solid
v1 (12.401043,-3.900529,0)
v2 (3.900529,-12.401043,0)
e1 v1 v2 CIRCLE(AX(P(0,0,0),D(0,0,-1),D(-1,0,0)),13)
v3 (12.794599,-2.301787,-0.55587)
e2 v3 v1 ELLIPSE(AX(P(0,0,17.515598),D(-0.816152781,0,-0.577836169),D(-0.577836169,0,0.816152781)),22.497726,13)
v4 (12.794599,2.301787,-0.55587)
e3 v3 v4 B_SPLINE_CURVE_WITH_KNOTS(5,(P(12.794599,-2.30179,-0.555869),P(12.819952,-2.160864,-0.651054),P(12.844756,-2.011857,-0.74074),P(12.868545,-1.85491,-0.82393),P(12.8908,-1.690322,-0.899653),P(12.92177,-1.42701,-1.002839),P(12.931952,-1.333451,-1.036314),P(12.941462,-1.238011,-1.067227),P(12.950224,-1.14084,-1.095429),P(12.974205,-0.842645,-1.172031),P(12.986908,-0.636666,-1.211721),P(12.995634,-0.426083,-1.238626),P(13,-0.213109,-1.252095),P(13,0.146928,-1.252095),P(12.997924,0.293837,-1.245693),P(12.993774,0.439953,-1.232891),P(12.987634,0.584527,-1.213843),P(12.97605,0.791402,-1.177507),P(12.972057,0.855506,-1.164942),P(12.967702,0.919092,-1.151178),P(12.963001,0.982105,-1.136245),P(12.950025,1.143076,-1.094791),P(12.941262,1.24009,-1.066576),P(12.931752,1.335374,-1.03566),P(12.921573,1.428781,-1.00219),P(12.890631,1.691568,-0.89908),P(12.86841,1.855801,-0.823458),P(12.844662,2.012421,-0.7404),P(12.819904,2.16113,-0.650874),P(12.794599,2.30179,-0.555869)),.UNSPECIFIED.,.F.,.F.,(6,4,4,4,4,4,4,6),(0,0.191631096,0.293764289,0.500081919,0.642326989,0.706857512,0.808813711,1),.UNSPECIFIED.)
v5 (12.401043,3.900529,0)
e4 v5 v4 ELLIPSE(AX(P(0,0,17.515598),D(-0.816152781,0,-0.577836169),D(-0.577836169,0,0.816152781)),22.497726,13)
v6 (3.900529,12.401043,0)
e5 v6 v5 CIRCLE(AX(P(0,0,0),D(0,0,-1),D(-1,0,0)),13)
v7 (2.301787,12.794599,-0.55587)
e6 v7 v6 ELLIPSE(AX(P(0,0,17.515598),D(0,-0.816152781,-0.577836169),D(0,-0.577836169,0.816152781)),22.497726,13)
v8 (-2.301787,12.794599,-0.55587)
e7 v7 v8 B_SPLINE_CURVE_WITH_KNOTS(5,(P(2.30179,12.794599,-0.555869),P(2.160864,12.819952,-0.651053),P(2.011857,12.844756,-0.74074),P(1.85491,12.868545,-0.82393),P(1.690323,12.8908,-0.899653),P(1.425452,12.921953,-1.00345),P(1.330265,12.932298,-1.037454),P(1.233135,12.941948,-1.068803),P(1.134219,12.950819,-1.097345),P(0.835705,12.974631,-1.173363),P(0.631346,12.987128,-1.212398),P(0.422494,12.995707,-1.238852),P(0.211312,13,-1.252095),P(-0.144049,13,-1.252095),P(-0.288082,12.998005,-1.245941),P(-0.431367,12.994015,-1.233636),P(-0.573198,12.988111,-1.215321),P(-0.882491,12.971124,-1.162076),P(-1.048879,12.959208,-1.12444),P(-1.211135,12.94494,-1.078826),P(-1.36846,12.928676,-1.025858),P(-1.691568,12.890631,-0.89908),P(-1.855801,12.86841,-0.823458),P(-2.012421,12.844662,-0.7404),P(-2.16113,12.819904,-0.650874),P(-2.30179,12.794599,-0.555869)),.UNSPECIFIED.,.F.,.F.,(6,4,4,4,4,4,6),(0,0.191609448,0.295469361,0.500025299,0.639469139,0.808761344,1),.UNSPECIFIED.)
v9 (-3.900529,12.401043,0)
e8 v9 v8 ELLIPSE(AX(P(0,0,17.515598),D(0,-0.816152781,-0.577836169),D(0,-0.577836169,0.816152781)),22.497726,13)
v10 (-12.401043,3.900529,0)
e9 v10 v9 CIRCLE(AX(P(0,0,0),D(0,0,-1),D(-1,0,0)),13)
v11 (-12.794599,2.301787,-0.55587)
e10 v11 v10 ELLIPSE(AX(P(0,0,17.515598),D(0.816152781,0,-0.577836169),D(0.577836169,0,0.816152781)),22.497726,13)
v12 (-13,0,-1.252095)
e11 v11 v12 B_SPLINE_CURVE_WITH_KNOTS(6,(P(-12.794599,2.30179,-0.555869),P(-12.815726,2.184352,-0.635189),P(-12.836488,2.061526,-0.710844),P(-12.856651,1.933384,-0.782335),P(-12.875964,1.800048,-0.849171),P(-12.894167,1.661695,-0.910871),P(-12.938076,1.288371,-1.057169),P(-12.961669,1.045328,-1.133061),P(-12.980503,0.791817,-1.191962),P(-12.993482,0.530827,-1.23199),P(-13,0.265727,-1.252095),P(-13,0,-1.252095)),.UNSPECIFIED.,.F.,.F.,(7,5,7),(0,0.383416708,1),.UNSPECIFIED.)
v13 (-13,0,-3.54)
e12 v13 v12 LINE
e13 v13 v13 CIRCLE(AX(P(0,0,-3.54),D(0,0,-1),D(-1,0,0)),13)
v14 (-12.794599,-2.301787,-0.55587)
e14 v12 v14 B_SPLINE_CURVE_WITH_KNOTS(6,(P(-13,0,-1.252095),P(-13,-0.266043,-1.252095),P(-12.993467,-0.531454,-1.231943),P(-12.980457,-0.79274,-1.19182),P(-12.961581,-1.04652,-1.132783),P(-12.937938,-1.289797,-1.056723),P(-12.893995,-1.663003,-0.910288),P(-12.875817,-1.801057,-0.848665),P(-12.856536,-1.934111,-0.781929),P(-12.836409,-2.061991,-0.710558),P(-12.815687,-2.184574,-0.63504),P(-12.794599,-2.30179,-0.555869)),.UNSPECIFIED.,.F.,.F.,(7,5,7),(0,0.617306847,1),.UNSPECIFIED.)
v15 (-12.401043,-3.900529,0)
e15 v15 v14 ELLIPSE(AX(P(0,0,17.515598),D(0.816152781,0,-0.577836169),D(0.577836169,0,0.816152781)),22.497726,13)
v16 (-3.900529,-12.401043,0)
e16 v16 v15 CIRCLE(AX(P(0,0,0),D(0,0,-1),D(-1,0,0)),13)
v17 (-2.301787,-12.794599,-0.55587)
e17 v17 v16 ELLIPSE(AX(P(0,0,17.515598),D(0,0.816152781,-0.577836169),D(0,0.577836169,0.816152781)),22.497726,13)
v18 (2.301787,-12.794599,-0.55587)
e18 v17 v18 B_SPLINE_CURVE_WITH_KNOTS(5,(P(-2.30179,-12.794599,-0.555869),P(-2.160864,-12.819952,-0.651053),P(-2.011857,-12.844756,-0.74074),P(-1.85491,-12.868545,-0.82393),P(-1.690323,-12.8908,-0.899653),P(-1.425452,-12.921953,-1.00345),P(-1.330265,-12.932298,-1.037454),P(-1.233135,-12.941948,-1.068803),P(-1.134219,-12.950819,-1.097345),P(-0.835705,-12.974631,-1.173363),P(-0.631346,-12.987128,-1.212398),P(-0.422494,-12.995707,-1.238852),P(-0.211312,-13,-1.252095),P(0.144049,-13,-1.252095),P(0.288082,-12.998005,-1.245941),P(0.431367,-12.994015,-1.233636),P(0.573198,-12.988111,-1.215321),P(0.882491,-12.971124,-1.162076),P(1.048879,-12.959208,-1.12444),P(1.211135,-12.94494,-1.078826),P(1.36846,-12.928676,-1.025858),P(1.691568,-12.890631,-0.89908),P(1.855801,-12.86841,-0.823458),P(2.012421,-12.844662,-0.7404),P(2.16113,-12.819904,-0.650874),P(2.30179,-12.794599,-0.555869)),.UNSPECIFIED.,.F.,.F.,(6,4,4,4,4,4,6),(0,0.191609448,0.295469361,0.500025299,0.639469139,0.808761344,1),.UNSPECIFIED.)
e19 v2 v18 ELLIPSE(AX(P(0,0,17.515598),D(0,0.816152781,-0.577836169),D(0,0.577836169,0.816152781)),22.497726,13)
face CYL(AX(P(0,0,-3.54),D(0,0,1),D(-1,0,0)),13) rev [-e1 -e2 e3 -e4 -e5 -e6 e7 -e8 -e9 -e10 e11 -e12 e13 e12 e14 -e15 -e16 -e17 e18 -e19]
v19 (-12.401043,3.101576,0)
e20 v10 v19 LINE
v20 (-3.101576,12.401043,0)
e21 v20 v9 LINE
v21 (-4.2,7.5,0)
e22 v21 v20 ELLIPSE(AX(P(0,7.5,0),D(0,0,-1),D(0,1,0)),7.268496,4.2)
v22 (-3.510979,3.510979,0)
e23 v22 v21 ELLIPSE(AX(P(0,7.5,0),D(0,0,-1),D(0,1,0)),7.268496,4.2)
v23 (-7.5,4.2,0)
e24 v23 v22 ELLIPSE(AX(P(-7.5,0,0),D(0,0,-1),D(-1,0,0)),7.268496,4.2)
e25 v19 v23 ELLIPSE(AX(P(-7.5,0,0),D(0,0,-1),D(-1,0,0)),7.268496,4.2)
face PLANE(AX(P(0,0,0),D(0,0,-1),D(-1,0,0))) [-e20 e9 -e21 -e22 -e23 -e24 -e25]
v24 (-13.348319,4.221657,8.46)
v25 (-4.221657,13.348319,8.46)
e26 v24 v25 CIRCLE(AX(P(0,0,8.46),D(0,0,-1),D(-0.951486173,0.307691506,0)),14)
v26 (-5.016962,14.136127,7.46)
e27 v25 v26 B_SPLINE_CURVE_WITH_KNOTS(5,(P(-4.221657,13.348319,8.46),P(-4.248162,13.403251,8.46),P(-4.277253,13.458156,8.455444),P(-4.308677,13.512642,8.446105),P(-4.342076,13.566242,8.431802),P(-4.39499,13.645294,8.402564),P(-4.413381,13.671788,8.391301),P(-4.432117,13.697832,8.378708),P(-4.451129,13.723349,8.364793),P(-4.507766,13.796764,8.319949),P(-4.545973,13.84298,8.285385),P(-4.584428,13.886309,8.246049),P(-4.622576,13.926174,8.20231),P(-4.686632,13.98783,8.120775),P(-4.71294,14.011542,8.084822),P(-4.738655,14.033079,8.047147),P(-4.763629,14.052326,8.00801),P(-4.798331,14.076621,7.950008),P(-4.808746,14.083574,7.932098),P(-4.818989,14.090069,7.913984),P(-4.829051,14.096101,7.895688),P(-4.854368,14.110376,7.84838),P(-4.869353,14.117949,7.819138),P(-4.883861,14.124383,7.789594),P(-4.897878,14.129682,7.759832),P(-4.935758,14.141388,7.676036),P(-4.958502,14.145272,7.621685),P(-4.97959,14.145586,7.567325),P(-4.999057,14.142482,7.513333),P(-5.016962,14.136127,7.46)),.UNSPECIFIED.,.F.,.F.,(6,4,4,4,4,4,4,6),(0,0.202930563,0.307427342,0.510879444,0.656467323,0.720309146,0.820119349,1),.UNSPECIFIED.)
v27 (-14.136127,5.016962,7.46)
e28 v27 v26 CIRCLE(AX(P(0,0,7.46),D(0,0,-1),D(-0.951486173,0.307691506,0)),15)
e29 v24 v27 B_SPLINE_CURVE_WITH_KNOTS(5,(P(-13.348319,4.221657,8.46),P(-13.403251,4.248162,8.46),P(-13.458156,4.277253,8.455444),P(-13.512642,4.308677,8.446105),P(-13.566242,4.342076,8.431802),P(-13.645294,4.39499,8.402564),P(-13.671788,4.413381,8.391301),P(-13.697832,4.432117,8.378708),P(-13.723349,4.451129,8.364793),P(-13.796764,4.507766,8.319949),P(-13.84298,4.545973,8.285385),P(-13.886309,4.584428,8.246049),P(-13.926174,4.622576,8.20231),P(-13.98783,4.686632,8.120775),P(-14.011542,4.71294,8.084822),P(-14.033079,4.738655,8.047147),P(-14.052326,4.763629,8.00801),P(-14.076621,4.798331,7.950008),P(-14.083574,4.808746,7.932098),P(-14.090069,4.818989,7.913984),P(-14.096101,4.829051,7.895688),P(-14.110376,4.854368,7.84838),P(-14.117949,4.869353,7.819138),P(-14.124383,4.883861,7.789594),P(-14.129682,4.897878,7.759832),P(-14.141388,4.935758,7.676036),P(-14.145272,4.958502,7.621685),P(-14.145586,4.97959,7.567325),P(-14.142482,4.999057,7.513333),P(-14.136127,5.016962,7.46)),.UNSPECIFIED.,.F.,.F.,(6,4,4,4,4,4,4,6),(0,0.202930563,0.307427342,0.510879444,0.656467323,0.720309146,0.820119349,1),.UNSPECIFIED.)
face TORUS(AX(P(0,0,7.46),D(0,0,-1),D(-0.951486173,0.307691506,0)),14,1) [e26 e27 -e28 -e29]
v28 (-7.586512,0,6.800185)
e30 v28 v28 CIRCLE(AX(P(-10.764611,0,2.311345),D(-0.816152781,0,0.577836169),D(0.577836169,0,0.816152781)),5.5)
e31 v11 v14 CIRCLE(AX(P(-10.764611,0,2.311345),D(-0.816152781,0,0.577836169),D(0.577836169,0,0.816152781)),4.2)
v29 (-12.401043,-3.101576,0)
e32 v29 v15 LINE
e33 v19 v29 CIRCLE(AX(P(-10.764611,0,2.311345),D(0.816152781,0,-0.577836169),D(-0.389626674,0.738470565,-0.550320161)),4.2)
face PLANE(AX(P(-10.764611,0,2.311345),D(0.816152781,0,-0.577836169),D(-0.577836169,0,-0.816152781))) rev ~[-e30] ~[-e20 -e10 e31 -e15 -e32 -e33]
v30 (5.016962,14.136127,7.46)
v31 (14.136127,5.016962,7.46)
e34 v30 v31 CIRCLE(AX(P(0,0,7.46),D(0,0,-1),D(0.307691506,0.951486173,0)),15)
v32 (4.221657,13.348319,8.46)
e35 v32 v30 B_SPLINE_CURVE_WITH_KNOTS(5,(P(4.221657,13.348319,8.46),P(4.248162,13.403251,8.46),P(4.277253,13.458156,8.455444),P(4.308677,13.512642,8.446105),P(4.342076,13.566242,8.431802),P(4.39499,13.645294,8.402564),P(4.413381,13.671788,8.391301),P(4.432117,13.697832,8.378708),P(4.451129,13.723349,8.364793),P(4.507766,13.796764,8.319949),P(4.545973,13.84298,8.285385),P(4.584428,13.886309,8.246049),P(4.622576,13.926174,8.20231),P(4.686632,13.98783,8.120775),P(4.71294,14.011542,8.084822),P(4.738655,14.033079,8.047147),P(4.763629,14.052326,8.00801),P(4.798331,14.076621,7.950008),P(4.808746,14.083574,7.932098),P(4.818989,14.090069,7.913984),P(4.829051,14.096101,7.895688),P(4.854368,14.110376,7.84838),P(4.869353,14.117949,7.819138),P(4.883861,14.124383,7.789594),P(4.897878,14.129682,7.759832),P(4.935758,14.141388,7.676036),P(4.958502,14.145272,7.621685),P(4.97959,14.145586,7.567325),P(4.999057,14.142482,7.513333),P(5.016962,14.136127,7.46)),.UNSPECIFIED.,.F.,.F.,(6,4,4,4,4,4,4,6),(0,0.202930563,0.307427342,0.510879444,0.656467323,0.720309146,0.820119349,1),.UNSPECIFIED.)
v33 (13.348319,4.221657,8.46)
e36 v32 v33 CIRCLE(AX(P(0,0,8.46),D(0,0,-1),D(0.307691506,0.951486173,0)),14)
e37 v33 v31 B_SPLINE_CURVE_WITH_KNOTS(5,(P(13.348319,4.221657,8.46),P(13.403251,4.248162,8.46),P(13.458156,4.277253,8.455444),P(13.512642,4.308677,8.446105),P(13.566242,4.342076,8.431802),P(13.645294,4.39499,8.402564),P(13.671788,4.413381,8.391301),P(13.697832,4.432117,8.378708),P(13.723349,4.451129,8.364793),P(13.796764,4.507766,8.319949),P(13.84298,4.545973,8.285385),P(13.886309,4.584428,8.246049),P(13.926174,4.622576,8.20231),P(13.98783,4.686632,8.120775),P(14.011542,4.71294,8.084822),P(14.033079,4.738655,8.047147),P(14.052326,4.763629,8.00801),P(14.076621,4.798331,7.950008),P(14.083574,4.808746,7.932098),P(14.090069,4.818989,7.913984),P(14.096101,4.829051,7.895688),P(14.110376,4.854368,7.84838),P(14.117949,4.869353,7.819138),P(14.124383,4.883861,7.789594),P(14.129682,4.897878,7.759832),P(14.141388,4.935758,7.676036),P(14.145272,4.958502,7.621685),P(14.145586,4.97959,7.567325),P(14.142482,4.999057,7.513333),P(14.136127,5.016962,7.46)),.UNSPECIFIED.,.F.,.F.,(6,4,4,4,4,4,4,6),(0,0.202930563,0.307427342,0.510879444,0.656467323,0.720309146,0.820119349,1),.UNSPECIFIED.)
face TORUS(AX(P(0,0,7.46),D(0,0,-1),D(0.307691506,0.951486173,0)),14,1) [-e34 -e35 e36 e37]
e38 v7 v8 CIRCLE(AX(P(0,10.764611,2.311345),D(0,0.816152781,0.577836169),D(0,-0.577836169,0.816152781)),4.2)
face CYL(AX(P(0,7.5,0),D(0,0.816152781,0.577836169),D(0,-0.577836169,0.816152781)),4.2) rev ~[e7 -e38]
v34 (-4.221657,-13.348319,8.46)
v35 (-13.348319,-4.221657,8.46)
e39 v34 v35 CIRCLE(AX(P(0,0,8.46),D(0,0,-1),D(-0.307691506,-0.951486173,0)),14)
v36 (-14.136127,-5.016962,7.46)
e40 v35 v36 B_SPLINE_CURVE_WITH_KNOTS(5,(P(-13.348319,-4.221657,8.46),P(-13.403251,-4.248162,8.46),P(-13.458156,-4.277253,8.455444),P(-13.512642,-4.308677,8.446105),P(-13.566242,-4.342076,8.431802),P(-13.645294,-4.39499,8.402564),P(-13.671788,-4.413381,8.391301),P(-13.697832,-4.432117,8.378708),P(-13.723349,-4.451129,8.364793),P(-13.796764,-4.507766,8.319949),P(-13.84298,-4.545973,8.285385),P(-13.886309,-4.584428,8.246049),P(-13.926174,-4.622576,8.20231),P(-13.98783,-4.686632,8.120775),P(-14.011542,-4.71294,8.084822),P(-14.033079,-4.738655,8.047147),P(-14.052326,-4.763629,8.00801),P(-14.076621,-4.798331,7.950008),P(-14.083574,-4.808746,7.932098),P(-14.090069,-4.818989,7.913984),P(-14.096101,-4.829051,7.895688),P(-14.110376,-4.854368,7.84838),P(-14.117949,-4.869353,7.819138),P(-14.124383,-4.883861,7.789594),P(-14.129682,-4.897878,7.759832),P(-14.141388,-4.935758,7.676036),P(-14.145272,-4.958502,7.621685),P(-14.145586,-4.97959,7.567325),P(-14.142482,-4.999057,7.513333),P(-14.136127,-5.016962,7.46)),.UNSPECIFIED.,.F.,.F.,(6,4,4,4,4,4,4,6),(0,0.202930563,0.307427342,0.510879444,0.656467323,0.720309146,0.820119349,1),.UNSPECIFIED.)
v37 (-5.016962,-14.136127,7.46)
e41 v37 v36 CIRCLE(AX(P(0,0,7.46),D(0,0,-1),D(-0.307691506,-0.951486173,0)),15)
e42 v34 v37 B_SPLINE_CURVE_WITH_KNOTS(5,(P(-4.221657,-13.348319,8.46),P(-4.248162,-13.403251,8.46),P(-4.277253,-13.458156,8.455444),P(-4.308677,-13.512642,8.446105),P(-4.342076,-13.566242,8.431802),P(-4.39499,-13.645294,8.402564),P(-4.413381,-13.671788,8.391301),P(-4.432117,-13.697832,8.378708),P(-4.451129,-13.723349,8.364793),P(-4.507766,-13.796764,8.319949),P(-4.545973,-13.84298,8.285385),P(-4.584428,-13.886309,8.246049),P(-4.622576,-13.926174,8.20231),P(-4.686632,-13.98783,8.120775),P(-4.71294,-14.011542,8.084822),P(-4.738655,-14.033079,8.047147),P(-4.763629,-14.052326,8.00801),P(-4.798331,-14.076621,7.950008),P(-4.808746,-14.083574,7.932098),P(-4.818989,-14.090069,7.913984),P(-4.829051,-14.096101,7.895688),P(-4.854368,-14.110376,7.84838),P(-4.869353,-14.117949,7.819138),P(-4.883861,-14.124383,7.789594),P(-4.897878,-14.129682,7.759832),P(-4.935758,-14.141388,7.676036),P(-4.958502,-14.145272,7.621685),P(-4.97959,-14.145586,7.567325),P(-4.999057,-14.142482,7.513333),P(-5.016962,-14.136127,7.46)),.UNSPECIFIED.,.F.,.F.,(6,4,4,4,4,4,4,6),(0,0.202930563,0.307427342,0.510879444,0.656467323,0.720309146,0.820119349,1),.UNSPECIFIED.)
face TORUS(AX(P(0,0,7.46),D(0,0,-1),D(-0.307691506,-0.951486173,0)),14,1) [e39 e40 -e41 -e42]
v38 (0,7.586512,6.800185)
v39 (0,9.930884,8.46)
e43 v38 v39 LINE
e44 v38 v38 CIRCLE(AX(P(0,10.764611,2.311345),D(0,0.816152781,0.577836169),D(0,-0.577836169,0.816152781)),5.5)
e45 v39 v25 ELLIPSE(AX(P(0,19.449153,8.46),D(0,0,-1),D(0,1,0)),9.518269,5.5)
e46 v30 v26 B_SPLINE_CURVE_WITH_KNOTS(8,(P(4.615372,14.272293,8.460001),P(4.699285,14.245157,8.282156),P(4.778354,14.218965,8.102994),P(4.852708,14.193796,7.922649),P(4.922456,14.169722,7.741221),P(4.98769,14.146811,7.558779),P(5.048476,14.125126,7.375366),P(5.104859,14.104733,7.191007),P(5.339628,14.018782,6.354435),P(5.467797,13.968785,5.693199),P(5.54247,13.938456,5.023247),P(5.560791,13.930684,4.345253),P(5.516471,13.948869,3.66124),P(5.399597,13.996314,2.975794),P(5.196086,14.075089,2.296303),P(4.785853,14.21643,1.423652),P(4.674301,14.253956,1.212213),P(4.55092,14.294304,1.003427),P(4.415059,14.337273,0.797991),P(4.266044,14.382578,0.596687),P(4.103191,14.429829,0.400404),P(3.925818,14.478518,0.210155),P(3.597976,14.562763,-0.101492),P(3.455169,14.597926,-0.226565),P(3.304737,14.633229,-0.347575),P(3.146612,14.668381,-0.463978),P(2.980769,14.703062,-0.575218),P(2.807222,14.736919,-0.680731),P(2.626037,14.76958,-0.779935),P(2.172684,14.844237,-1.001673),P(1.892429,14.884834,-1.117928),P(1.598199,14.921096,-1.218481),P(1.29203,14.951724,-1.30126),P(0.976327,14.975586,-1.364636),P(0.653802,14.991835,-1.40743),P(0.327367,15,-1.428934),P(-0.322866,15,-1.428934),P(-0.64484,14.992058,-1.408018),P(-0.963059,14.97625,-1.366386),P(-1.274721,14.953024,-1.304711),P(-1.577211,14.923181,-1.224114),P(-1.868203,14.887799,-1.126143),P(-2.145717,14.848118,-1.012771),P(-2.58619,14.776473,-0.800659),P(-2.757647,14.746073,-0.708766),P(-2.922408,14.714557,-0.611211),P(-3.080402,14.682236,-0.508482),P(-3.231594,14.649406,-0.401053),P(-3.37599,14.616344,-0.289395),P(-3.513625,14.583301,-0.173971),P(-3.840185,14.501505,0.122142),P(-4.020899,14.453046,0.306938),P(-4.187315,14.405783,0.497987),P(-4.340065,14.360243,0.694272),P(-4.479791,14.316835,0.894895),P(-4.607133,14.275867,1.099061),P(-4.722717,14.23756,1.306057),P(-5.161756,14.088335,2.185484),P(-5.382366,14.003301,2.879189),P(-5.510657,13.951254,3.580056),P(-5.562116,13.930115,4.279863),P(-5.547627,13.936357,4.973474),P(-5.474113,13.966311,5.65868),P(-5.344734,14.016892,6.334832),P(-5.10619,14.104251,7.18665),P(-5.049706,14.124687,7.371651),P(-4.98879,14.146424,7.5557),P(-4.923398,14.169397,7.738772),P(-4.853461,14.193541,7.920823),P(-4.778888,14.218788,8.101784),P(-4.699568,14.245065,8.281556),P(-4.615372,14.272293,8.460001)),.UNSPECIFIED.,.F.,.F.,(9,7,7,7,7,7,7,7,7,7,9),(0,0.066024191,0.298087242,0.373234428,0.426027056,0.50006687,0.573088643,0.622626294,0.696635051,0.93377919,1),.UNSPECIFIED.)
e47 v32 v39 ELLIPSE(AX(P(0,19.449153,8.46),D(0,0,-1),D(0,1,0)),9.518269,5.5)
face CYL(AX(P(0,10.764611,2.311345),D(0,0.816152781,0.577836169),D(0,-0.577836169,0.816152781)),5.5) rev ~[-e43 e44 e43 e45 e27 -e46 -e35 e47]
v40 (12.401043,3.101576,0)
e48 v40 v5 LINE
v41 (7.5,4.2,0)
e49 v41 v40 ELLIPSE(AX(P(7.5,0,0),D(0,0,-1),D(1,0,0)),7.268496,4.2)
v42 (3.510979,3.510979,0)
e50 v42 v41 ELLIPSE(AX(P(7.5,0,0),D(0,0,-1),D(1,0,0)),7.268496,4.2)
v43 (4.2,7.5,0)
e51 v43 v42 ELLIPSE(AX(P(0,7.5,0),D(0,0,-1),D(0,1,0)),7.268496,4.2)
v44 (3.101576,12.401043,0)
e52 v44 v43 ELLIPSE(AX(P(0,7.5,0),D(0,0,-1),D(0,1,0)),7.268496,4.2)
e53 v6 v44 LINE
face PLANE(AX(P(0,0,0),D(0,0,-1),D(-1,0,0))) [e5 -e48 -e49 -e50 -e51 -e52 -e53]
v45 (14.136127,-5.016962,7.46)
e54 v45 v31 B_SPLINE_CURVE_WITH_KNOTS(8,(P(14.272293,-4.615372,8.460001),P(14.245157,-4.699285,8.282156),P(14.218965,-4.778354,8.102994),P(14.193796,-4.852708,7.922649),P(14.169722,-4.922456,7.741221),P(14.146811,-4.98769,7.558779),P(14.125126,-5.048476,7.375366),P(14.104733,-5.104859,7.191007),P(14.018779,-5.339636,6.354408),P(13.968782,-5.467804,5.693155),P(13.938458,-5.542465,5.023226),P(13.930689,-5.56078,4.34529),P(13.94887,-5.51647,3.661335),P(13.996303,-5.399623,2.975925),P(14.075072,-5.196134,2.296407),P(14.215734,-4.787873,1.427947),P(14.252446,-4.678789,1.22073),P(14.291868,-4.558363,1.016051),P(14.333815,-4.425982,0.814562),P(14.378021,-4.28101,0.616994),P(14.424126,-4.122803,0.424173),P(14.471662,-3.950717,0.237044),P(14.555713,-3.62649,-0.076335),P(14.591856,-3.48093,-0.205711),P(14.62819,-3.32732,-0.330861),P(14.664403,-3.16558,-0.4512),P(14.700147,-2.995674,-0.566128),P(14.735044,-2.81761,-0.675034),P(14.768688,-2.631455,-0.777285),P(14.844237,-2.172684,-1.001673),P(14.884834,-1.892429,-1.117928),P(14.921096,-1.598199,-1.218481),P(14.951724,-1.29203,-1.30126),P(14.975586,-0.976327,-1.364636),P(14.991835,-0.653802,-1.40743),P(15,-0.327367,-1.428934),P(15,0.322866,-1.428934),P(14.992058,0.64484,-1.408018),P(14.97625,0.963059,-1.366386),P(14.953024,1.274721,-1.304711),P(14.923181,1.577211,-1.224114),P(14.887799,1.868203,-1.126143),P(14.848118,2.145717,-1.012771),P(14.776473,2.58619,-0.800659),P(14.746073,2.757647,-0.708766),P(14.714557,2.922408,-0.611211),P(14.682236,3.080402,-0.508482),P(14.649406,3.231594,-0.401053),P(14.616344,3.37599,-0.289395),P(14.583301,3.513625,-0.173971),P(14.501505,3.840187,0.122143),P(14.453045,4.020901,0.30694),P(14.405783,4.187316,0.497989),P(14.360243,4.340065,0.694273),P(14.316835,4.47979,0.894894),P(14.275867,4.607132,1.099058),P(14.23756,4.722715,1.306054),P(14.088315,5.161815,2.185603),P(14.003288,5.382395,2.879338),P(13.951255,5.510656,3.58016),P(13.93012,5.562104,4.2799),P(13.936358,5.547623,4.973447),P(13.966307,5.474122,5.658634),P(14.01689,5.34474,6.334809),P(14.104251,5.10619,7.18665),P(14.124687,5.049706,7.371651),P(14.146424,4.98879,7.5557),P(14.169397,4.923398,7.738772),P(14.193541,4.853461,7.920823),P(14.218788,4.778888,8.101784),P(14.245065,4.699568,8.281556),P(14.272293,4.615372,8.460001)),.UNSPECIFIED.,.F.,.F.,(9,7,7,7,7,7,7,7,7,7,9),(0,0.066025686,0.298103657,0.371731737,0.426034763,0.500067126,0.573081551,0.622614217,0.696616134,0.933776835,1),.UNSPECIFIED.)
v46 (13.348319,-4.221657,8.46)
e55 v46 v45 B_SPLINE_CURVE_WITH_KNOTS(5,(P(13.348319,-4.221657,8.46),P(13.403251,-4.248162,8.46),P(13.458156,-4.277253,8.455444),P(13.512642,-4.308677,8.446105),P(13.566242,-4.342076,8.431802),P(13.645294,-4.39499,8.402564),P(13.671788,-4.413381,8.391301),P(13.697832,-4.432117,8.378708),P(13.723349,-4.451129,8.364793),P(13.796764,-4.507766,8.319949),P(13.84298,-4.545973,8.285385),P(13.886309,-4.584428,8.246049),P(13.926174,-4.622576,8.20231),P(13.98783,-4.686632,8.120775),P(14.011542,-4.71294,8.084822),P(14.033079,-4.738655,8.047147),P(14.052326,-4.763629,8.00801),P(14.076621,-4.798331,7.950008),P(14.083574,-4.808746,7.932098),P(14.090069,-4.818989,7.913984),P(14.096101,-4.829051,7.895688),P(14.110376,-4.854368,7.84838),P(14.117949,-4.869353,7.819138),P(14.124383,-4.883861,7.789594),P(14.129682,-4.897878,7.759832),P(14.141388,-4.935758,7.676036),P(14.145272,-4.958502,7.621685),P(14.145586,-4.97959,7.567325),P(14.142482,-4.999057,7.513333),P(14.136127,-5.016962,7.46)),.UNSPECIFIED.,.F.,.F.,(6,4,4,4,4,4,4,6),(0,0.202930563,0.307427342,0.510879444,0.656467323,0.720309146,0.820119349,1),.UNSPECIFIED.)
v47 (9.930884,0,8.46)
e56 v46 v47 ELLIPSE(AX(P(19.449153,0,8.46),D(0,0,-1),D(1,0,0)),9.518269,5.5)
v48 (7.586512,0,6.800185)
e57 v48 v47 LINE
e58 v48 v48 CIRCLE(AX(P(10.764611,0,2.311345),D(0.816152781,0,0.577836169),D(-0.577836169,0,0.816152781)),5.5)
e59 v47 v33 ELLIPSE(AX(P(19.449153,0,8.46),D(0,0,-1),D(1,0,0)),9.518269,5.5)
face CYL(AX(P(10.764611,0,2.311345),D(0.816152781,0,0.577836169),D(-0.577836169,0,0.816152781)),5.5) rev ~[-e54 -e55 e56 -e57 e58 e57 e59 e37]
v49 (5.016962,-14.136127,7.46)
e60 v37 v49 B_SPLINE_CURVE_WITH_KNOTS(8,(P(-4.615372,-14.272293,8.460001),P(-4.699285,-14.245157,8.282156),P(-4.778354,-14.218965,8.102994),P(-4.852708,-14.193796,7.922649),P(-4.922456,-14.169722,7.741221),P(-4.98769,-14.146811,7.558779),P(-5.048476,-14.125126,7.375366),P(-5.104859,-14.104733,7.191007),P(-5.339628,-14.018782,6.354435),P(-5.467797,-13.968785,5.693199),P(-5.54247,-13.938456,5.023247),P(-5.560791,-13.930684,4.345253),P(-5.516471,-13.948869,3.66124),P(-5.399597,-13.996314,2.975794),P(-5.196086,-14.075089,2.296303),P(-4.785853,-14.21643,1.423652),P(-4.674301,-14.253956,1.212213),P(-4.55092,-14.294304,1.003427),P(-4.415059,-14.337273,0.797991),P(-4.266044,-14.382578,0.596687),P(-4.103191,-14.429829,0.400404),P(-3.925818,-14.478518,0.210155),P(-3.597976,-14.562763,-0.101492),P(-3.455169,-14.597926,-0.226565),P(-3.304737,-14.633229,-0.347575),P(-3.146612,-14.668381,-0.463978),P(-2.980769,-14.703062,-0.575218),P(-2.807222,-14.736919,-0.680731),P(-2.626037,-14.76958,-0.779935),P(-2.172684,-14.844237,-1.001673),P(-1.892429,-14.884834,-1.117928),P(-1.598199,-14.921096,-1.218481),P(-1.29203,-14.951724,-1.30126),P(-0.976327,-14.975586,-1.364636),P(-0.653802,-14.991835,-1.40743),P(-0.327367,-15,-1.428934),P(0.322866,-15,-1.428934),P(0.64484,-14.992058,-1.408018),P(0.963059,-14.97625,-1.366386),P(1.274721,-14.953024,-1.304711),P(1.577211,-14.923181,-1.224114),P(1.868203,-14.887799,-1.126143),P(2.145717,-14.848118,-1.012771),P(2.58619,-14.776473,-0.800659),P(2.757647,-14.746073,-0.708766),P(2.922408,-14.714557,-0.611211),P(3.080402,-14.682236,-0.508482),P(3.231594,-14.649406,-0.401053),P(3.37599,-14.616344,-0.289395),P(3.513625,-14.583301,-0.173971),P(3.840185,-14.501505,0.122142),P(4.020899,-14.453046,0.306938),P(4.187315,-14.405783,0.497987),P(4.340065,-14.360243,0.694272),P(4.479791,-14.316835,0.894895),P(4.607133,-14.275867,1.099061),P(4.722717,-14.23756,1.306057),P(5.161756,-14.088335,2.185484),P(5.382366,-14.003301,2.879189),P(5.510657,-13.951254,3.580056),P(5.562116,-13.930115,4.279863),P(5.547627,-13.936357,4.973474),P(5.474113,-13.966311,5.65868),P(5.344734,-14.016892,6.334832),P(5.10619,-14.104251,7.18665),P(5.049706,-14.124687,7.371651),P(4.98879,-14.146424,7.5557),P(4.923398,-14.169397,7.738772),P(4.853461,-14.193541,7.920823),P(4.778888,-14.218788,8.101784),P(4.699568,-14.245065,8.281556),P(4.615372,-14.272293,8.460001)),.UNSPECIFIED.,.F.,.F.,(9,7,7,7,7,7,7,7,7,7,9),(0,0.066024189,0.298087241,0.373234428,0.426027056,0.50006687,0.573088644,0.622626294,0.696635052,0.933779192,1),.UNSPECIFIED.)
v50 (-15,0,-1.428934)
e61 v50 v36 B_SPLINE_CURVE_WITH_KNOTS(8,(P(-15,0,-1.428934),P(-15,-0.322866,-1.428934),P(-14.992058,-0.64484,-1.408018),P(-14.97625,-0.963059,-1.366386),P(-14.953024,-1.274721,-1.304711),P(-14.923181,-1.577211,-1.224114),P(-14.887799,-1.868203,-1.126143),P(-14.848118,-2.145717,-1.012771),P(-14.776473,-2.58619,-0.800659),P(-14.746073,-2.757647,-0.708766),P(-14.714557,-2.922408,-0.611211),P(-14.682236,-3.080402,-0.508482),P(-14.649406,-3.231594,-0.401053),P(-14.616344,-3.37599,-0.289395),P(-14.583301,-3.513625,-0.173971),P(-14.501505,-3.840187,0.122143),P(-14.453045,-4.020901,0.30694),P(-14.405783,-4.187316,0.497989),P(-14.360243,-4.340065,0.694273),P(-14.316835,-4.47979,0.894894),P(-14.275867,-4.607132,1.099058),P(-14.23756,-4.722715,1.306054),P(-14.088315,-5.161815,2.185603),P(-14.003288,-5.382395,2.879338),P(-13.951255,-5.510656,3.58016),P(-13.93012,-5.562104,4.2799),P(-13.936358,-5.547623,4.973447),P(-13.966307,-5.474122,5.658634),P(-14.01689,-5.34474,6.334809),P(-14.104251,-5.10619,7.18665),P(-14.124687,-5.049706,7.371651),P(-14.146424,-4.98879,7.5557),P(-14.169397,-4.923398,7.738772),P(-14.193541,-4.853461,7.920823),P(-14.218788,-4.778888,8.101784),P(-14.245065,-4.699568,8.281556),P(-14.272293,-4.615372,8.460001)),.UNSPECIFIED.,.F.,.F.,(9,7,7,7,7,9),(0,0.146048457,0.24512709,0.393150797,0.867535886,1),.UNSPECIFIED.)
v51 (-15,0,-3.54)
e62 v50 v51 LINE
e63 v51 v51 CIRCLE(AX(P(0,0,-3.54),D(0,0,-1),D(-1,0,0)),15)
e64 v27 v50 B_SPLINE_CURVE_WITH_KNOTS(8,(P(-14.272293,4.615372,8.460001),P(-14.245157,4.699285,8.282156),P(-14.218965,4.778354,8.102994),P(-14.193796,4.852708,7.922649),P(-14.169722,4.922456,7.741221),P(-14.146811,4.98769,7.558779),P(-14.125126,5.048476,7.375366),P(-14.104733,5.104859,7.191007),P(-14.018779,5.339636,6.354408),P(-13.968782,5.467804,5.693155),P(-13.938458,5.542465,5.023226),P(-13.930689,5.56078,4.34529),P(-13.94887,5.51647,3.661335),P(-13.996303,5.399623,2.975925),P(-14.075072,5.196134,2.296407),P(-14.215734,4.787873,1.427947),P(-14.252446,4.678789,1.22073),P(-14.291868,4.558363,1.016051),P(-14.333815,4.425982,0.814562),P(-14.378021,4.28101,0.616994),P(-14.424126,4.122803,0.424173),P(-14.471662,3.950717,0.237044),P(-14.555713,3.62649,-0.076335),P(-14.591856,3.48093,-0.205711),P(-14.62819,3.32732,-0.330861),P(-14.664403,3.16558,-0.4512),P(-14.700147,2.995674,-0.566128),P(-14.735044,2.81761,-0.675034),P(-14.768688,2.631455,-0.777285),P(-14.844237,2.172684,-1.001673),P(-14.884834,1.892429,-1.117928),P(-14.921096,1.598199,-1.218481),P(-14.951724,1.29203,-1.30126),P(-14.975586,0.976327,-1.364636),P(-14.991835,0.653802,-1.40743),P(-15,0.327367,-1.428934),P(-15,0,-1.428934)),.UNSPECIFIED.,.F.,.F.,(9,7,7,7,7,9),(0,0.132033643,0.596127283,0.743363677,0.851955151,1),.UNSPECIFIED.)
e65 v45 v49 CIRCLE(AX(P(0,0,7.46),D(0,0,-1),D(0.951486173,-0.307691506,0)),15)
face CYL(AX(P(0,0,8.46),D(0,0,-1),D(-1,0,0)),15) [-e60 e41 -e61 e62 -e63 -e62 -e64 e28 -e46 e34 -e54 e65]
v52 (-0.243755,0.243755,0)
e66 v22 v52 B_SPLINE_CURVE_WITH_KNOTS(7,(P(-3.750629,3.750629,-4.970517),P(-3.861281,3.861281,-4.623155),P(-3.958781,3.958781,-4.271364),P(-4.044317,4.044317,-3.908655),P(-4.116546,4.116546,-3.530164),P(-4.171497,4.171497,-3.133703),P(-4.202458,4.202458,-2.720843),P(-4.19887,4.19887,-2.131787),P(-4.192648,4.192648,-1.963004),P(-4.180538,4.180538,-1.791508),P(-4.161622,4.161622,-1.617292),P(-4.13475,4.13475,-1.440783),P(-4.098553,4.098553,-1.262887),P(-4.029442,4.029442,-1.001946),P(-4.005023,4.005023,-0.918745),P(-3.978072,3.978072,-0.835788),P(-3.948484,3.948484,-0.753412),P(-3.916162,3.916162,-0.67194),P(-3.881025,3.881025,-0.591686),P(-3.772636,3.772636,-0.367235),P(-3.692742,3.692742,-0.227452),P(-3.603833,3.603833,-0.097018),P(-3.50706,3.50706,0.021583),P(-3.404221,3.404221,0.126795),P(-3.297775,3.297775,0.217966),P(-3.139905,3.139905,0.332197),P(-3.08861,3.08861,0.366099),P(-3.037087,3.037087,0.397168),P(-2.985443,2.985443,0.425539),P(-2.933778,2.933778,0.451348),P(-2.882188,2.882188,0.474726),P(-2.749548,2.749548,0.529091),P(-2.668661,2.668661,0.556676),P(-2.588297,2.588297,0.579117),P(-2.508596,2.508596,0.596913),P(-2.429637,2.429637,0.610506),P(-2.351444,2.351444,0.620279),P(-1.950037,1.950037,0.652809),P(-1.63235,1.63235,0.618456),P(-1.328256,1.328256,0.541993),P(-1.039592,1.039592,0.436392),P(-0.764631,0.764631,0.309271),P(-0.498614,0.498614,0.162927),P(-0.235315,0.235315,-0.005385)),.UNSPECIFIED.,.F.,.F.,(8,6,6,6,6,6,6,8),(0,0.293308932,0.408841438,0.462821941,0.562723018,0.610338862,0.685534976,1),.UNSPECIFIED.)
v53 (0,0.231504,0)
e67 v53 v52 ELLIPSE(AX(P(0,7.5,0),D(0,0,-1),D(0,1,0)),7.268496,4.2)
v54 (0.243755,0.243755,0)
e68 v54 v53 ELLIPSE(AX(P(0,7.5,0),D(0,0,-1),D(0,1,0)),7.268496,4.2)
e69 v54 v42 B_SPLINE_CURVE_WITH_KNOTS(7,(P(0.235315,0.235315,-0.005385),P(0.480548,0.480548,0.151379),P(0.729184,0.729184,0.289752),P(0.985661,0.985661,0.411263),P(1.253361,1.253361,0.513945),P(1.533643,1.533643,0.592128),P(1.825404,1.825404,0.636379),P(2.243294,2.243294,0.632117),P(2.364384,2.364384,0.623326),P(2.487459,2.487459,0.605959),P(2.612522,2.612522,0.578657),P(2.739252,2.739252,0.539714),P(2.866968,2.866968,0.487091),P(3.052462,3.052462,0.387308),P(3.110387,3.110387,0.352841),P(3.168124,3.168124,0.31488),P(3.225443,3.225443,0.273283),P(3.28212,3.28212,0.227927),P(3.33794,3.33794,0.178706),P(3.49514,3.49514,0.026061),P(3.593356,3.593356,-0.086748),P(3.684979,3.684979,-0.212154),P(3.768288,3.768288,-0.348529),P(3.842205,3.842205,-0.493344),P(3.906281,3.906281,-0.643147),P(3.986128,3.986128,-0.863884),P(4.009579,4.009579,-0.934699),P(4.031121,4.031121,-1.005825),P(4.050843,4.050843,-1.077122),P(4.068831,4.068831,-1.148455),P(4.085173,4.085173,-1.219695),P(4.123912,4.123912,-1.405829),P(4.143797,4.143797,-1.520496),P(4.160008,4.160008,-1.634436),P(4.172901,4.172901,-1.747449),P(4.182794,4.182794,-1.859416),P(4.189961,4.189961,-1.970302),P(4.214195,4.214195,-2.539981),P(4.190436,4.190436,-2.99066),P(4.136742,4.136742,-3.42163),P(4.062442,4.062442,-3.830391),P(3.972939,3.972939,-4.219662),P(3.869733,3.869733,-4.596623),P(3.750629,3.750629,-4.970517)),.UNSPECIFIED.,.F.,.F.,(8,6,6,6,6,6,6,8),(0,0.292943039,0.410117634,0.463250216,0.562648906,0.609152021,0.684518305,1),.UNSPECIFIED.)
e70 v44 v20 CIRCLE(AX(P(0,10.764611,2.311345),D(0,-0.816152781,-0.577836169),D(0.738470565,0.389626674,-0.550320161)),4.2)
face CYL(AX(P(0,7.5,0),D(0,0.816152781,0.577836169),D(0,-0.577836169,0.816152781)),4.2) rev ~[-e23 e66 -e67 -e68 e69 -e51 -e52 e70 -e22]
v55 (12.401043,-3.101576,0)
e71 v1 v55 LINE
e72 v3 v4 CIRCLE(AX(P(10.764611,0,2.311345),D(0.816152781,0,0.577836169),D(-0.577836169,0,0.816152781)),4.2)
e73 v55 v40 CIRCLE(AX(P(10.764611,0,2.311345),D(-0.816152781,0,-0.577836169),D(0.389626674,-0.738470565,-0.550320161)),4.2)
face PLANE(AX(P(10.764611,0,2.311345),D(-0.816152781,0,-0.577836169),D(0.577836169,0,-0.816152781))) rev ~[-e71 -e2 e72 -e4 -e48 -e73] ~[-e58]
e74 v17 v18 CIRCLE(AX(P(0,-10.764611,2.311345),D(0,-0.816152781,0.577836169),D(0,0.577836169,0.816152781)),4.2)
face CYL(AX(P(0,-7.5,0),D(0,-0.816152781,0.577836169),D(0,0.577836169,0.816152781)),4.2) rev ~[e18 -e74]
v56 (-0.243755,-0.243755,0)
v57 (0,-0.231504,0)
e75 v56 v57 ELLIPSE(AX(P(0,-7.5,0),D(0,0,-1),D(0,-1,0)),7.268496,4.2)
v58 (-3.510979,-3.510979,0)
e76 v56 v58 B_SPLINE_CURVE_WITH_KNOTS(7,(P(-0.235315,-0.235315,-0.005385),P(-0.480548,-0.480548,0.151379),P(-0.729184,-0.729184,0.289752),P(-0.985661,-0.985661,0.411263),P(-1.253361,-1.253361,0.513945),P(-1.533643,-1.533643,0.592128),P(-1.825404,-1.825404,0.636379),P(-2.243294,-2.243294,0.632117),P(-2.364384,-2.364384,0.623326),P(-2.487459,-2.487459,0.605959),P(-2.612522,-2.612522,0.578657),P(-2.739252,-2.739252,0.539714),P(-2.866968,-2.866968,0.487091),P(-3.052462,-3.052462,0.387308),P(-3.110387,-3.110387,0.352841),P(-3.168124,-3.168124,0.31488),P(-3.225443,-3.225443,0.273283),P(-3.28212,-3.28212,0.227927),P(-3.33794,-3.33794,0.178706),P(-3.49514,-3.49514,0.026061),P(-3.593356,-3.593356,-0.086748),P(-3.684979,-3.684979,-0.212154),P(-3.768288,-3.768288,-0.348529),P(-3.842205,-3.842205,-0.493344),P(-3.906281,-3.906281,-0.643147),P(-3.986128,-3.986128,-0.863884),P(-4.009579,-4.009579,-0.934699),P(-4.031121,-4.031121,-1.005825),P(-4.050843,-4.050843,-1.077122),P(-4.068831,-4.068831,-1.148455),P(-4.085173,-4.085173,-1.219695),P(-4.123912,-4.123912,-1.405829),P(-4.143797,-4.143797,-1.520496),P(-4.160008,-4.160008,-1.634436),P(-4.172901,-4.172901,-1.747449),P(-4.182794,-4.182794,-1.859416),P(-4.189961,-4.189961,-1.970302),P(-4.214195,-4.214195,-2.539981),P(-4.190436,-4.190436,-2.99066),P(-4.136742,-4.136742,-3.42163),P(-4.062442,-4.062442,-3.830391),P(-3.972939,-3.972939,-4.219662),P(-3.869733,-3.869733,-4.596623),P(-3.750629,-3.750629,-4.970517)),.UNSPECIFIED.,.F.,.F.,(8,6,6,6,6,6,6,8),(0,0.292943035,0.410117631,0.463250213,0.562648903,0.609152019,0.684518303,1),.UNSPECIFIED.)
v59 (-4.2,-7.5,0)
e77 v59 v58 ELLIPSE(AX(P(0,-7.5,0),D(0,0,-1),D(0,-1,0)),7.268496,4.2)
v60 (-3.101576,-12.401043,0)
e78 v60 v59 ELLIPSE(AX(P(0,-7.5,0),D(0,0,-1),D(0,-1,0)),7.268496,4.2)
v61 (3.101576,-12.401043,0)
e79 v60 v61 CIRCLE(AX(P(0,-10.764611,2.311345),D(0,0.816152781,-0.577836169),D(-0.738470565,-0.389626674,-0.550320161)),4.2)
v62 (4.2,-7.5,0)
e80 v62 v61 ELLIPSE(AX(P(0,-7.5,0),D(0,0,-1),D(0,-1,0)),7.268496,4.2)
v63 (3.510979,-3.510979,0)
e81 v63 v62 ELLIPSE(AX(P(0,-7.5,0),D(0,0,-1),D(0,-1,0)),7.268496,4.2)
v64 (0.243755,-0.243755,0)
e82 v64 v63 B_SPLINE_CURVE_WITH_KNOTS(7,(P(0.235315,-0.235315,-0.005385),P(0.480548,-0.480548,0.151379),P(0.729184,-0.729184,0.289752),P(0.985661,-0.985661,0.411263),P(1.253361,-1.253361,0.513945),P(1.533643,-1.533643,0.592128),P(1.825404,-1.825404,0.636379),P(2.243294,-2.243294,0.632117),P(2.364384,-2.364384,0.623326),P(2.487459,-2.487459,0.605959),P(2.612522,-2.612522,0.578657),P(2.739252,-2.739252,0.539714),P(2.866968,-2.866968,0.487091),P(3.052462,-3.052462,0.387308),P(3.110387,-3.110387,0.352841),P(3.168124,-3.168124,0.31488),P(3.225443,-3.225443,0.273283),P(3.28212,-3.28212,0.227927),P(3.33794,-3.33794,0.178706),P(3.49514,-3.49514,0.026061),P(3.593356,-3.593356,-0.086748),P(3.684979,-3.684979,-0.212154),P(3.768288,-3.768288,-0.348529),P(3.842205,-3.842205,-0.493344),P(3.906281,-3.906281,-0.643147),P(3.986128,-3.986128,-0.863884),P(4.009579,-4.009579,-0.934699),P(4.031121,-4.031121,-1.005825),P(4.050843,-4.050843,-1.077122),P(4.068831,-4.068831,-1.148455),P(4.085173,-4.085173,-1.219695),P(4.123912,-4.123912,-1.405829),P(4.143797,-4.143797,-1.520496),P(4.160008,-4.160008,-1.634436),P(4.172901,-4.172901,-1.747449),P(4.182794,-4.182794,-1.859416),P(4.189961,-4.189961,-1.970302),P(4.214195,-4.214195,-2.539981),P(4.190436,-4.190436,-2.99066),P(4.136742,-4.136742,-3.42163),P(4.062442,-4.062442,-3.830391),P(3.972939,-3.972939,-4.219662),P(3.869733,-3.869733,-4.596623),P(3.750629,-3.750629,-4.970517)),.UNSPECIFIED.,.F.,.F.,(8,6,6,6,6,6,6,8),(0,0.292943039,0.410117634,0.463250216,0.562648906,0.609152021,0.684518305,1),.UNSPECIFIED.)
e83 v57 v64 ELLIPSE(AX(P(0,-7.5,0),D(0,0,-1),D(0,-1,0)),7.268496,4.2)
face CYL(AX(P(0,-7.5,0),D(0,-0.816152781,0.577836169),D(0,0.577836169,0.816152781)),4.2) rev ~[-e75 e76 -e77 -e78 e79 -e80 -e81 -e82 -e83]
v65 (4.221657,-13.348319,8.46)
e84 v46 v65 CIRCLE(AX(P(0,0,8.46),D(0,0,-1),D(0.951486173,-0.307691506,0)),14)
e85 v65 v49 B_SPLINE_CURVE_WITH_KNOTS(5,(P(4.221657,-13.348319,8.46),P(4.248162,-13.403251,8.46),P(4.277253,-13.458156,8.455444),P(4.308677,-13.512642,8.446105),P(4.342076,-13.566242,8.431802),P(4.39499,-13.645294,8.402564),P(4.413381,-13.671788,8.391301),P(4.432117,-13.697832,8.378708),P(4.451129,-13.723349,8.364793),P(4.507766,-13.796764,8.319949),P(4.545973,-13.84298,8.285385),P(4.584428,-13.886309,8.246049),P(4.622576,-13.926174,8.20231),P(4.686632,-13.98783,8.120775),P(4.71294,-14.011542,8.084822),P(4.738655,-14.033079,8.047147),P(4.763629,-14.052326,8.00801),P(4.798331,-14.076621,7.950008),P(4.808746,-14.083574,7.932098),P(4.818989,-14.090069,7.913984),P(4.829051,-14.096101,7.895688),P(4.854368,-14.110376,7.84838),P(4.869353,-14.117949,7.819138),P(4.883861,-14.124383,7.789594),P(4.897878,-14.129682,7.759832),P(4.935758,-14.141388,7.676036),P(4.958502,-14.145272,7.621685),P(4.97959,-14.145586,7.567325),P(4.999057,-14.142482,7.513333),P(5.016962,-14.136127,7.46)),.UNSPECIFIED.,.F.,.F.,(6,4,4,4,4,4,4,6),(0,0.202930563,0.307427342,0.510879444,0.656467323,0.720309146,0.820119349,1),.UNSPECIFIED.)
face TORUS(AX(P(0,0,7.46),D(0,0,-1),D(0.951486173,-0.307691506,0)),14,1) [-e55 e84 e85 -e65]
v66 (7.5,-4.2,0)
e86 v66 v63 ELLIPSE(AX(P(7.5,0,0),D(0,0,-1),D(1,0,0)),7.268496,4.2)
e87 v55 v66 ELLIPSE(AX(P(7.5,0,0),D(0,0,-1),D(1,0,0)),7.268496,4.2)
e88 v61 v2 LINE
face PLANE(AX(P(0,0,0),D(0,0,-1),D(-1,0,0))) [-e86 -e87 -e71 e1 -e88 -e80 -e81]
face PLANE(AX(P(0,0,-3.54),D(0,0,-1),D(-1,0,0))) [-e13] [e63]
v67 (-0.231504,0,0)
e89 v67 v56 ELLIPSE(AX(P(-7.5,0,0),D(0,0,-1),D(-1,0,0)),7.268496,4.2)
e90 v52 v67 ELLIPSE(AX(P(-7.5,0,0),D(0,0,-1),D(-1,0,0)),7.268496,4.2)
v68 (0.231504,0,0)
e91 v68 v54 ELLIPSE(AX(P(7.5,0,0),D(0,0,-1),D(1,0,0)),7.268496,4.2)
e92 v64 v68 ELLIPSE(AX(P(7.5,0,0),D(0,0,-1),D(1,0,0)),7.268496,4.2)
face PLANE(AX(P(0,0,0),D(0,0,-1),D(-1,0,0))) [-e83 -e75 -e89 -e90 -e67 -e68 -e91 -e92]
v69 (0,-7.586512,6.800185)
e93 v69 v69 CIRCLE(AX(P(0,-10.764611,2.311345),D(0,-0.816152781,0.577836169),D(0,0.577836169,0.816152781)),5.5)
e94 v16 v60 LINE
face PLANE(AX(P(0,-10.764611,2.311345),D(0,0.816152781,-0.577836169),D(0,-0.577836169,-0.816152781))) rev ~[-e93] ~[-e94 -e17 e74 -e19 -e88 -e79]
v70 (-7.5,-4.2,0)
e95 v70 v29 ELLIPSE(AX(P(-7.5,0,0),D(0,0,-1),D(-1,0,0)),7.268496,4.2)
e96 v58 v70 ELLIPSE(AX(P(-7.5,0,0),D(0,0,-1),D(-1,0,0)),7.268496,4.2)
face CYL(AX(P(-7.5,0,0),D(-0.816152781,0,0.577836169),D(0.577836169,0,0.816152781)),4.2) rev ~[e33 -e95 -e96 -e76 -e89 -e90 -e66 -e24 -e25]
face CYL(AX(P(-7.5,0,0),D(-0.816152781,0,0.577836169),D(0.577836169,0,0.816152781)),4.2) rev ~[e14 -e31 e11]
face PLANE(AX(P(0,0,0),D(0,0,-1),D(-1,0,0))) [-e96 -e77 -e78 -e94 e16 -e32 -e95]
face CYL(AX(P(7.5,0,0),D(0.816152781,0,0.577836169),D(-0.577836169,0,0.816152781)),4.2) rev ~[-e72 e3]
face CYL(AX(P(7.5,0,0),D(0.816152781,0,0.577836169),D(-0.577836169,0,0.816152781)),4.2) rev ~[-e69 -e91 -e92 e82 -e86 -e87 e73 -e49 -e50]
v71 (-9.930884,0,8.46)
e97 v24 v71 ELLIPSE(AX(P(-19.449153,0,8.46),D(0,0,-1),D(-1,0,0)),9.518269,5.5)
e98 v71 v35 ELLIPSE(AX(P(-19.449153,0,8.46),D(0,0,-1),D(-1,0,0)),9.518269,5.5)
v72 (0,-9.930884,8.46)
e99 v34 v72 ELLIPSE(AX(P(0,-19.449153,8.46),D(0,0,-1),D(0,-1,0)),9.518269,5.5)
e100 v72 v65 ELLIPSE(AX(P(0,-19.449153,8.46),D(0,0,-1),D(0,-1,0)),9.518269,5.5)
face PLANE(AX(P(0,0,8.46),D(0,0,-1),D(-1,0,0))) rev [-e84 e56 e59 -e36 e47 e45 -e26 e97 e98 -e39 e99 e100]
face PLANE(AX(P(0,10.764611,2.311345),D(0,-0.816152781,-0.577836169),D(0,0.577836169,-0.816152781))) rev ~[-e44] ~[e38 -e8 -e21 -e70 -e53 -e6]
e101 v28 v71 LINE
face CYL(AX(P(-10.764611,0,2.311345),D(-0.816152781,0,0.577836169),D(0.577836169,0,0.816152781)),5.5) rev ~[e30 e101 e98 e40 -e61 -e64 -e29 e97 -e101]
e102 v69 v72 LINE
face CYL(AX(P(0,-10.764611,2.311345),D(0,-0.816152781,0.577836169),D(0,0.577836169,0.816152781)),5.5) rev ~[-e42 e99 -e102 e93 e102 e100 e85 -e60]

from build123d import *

# Parameters (mm, degrees)
F6_COPIES_COUNT = 4
F7_R            = 1


# Not quite as in the source:
# - a pattern or mirror of a feature is missing from the dataset's text; its kind, count and spacing are read off the source's solid


with BuildPart() as f4:
    # F3 (on Front) → F4 (revolve)
    with BuildSketch(Plane.XZ):
        Polygon((0, 0), (0, 8.46), (-15, 8.46), (-15, -3.54), (-13, -3.54), (-13, 0), align=None)
    revolve(axis=Axis((0, 0, -4.2355582118), (0, 0, -1)))

    # F5 (on Front) → F6 (revolve, cut)
    with BuildSketch(Plane.XZ):
        Polygon((-0.1761714047, -0.0391753335), (-5.0730880905, 3.4278416801), (-8.3376992144, 5.7391863558), (-7.5865121948, 6.800184971), (-14.1157344425, 11.4228743224), (-17.2938333716, 6.9340340271), (-7.5, 0), (-2.5972818806, -3.4588228983), align=None)
    f6 = revolve(axis=Axis((-9.8969166858, 0, 1.6970170136), (-0.816152781, 0, 0.5778361689)), mode=Mode.SUBTRACT)

    # F6_copies: F6 ×4 about axis
    f6_copies_axis = Axis((0, 0, 0), (0, 0, 1))
    for i in range(1, F6_COPIES_COUNT):
        add(f6.rotate(f6_copies_axis, i * 360 / F6_COPIES_COUNT), mode=Mode.SUBTRACT)

    # F7
    f7_edges = [f4.edges().sort_by_distance(p)[0] for p in [
        (-10.606602, 10.606602, 8.46),
        (10.606602, 10.606602, 8.46),
        (10.606602, -10.606602, 8.46),
        (-10.606602, -10.606602, 8.46),
    ]]
    fillet(f7_edges, radius=F7_R)


solid = f4.part
